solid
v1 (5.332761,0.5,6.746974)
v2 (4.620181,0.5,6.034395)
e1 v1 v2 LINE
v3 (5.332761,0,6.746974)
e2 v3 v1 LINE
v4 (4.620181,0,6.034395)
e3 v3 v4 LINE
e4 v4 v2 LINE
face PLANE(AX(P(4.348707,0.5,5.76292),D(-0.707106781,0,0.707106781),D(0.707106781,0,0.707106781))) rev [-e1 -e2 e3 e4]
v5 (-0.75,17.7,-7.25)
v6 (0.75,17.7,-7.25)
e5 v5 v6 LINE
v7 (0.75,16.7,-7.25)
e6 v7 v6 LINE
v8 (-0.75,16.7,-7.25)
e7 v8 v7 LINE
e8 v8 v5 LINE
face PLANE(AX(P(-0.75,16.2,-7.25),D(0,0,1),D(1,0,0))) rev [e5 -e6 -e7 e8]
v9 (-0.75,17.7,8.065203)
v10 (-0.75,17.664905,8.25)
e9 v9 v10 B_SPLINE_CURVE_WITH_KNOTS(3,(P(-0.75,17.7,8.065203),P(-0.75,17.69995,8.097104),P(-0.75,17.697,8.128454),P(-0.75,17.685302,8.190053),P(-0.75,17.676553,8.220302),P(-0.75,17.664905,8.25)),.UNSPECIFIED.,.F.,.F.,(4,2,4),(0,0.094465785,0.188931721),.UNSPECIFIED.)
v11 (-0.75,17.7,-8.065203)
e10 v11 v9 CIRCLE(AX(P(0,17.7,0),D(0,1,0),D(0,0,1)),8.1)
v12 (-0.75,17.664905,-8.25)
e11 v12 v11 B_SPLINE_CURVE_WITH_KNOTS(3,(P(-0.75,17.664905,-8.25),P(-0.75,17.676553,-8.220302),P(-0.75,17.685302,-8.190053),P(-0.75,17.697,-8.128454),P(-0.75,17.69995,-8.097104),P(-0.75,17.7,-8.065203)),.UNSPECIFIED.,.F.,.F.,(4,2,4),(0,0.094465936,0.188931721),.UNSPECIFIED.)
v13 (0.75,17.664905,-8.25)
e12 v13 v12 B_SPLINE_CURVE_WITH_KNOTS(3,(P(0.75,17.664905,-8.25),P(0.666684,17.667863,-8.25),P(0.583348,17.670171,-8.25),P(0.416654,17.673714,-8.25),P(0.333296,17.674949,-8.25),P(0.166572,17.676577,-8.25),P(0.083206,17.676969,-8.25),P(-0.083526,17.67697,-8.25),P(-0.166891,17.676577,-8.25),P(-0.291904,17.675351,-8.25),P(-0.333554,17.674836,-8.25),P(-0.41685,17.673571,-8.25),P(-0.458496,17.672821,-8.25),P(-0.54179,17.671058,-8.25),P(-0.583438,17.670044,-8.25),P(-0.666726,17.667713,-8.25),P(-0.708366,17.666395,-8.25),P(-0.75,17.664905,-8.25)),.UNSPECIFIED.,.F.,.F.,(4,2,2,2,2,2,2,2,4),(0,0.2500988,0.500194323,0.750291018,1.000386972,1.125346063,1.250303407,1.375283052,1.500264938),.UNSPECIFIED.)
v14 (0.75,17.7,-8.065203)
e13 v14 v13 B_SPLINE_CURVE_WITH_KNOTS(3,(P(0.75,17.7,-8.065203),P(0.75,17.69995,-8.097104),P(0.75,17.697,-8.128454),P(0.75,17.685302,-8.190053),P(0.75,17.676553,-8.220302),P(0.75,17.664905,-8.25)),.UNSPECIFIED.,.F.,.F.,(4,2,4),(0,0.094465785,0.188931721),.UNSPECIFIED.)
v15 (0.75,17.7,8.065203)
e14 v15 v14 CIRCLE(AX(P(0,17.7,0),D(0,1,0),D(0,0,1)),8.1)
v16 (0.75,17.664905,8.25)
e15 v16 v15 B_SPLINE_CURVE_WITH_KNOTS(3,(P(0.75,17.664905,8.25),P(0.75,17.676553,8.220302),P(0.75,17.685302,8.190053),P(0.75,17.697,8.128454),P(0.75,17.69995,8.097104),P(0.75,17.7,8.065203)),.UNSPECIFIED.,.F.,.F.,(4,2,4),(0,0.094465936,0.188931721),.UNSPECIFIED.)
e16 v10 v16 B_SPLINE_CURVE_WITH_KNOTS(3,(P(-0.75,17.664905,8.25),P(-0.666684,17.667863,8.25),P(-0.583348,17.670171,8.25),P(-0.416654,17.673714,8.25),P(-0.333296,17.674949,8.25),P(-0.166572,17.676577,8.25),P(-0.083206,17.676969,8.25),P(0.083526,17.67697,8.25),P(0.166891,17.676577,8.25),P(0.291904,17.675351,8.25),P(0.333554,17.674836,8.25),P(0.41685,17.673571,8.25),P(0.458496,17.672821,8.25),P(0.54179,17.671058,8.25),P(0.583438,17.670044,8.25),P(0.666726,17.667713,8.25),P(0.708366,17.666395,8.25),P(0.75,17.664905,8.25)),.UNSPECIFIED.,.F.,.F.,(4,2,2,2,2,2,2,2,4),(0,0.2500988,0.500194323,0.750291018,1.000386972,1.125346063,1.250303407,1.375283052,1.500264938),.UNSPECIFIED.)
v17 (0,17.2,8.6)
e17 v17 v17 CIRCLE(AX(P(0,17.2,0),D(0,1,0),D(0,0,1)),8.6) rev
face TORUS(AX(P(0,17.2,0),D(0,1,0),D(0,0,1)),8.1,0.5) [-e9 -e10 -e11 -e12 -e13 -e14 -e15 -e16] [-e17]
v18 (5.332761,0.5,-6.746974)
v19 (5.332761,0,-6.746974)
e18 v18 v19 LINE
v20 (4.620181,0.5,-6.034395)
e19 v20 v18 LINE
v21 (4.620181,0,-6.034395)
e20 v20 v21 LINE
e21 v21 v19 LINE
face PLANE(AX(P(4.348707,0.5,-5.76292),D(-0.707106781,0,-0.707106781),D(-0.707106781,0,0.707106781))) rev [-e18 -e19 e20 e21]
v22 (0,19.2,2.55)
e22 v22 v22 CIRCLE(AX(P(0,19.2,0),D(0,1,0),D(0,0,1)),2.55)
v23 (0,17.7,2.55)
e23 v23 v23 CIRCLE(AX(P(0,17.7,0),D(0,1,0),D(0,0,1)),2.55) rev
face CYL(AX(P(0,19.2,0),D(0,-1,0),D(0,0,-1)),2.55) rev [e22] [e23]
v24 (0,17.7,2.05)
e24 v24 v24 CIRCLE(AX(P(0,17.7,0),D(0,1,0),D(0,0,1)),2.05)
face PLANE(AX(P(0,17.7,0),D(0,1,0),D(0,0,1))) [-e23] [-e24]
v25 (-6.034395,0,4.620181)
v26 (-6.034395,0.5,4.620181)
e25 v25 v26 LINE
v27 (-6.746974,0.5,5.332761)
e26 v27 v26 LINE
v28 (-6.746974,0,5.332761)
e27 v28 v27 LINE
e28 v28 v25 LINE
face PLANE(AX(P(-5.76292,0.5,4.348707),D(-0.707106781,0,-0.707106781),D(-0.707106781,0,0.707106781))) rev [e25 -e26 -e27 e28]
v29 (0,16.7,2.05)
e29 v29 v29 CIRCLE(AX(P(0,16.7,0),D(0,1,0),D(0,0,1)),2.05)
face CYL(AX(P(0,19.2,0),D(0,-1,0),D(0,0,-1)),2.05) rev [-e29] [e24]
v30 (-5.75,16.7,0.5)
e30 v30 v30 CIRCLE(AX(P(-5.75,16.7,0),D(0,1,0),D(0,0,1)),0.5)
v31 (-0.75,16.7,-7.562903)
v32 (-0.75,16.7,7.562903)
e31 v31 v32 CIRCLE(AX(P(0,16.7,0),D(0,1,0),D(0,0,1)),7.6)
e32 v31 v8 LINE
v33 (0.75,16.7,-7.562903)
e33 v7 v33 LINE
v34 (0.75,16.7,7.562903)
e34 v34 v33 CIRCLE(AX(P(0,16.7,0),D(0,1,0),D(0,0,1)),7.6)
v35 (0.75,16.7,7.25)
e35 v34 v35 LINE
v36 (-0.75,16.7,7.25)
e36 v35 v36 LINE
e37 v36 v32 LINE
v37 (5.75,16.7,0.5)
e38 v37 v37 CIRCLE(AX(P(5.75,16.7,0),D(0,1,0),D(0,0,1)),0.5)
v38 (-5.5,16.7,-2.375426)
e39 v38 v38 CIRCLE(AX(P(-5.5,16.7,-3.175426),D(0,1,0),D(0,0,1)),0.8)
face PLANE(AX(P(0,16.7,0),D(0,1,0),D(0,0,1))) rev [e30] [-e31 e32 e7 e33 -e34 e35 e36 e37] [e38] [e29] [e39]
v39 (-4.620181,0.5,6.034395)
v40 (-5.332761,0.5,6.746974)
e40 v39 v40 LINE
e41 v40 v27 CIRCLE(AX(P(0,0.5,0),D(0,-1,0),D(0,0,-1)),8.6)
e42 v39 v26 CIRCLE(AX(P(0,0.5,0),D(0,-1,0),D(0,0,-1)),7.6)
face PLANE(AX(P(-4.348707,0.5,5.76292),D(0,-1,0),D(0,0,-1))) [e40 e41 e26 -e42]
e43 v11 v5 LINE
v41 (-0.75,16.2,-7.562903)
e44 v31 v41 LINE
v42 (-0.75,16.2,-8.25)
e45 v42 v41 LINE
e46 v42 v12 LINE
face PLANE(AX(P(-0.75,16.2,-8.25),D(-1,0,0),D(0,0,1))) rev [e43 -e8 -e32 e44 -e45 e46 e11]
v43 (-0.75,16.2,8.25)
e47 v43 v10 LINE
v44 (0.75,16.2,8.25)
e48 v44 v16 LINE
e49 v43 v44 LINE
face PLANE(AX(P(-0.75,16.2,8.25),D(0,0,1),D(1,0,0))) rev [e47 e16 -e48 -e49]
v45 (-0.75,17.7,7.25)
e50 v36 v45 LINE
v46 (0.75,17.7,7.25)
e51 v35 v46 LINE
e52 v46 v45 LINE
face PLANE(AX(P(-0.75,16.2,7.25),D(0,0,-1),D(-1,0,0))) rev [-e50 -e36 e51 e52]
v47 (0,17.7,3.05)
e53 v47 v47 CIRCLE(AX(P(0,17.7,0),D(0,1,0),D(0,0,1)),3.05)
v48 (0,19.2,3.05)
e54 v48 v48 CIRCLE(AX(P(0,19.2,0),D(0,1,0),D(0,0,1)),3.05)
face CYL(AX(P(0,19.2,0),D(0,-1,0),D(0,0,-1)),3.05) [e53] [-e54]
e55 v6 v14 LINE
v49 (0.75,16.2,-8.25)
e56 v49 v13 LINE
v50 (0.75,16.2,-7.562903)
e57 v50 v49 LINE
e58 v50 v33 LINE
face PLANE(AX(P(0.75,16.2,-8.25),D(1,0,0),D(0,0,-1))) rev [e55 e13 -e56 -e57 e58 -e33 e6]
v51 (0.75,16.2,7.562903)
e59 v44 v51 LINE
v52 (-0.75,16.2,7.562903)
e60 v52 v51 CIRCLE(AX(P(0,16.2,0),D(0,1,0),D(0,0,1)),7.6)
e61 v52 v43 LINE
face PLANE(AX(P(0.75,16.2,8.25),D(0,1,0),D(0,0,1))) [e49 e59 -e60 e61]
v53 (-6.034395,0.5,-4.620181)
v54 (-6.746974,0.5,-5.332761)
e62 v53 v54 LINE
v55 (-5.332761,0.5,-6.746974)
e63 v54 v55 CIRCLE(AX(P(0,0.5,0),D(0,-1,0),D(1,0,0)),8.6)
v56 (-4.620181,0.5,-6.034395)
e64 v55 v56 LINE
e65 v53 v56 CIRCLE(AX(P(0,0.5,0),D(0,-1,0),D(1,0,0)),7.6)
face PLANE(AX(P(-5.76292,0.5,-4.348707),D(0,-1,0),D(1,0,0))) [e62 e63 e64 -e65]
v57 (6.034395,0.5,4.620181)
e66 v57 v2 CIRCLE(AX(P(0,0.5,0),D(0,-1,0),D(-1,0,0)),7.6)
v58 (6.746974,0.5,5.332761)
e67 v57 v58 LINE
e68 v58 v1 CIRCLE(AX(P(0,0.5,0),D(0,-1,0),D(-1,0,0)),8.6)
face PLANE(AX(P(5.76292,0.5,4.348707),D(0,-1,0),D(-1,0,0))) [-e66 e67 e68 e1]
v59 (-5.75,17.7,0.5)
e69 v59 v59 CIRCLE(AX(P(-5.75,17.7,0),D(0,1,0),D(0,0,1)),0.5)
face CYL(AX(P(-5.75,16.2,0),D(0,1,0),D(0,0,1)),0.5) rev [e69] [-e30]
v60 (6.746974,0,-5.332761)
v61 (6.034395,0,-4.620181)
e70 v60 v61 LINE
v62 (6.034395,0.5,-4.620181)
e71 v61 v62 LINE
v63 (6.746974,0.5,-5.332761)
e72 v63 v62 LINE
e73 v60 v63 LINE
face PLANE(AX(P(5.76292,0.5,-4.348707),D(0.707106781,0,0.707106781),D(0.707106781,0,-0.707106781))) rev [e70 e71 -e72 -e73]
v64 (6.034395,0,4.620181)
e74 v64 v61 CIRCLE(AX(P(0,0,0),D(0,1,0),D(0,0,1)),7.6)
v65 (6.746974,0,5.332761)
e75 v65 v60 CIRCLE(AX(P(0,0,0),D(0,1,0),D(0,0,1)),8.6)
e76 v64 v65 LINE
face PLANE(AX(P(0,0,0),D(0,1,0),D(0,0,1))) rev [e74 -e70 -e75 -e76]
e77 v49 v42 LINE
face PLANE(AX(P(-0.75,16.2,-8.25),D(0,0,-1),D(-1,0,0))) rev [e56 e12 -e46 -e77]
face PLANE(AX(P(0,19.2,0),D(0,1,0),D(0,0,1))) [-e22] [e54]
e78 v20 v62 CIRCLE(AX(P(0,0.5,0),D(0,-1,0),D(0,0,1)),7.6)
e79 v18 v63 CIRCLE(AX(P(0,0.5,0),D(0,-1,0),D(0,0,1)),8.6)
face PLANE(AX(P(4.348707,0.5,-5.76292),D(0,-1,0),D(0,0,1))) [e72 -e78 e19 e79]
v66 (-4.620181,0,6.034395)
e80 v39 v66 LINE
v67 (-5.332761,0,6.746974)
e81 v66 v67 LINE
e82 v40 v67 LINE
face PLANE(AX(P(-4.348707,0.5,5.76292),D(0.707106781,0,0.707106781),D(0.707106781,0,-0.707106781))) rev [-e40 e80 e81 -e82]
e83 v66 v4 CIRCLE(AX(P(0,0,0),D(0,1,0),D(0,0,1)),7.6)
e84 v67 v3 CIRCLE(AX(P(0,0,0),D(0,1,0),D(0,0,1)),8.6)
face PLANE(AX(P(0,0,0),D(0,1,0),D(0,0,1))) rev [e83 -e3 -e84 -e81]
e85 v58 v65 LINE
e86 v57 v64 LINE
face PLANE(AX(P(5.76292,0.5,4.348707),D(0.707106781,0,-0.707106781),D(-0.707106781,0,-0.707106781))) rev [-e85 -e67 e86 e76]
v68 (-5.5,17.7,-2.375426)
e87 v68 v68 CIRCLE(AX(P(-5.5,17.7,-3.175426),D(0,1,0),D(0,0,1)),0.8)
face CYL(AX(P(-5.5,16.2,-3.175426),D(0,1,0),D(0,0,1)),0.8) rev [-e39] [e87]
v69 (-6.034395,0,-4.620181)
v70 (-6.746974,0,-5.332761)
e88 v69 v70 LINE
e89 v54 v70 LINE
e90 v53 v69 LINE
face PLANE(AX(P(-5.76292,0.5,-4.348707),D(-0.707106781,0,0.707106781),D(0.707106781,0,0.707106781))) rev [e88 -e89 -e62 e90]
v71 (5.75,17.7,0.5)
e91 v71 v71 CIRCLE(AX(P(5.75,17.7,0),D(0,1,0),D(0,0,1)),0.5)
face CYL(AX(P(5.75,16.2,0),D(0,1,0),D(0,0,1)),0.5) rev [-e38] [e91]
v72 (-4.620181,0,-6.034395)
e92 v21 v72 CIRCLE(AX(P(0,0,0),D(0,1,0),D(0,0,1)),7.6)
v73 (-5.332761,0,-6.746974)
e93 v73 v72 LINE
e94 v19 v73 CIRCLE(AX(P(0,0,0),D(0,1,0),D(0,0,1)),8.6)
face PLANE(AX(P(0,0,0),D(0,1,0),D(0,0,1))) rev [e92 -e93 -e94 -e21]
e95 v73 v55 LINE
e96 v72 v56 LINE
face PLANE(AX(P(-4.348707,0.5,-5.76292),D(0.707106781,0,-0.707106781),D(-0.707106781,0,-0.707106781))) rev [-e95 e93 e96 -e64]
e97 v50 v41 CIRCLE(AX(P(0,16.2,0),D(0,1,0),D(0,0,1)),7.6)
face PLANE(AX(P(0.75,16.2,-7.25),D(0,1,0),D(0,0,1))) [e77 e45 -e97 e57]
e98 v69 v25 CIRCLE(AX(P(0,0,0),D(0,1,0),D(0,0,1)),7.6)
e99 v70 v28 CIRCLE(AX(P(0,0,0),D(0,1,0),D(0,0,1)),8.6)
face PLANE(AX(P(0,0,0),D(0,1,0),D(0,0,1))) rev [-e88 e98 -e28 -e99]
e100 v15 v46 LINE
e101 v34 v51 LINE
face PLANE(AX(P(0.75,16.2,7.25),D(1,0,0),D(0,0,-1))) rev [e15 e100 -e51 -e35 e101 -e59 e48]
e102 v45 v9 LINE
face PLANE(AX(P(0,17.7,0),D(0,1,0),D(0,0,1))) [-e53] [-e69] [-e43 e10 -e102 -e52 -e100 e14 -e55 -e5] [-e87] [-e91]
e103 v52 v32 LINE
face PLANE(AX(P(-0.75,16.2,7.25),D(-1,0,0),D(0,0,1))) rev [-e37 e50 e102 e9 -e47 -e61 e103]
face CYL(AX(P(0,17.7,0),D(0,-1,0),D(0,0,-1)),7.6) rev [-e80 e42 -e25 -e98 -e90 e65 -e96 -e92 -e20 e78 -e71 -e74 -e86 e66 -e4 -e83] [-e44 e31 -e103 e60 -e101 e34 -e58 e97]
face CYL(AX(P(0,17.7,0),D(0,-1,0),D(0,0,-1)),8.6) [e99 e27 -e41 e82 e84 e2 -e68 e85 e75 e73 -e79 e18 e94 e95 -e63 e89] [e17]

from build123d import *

# Parameters (mm, degrees)
SKETCH_1_R               = 8.6
EXTRUDE_1_DEPTH          = 17.7
SKETCH_2_R               = 3.05
SKETCH_2_R_2             = 2.55
EXTRUDE_2_DEPTH          = 1.5
SHELL_4_OUTLINE_R        = 7.6
SHELL_4_DEPTH            = 16.7
SHELL_START              = 16.7
SHELL_4_2_OUTLINE_R      = 2.05
SHELL_4_2_DEPTH          = 1
SKETCH_5_R               = 0.8
SKETCH_5_R_2             = 0.5
SKETCH_5_W               = 1.5
SKETCH_5_H               = 1
CUT_EXTRUDE_5_DEPTH      = 1.5
CUT_EXTRUDE_6_DEPTH      = 0.5
PATTERN_CIRCULAR_1_COUNT = 4
FILLET_1_R               = 0.5


# Read off the part's stored shape, not the designer's step: 薄殼4
with BuildPart() as part:
    # 草圖1 → 伸長1 (new body)
    with BuildSketch(Plane(origin=(0, 0, 0), x_dir=(1, 0, 0), z_dir=(0, 1, 0))):
        with Locations(Location((0, 0, 0), (0, 0, 270))):
            Circle(SKETCH_1_R)
    extrude(amount=EXTRUDE_1_DEPTH)

    # 草圖2 → 伸長2 (add)
    with BuildSketch(Plane(origin=(0, 17.7, 0), x_dir=(1, 0, 0), z_dir=(0, 1, 0))):
        with Locations(Location((0, 0, 0), (0, 0, 270))):
            Circle(SKETCH_2_R)
        with Locations(Location((0, 0, 0), (0, 0, 270))):
            Circle(SKETCH_2_R_2, mode=Mode.SUBTRACT)
    extrude(amount=EXTRUDE_2_DEPTH)

    # 薄殼4 outline → 薄殼4 (cut)
    with BuildSketch(Plane(origin=(0, 0, 0), x_dir=(1, 0, 0), z_dir=(0, 1, 0))):
        Circle(SHELL_4_OUTLINE_R)
    extrude(amount=SHELL_4_DEPTH, mode=Mode.SUBTRACT)

    # Shell 4 2 outline → Shell 4 2 (cut)
    with BuildSketch(Plane(origin=(0, 0, 0), x_dir=(1, 0, 0), z_dir=(0, 1, 0)).offset(SHELL_START)):
        Circle(SHELL_4_2_OUTLINE_R)
    extrude(amount=SHELL_4_2_DEPTH, mode=Mode.SUBTRACT)

    # 草圖5 → 伸長5 (cut)
    with BuildSketch(Plane(origin=(0, 17.7, 0), x_dir=(1, 0, 0), z_dir=(0, 1, 0))):
        with Locations(Location((-5.5, 3.175426481, 0), (0, 0, 270))):
            Circle(SKETCH_5_R)
        with Locations(Location((-5.75, 0, 0), (0, 0, 270))):
            Circle(SKETCH_5_R_2)
        with Locations(Location((5.75, 0, 0), (0, 0, 270))):
            Circle(SKETCH_5_R_2)
        with Locations((0, 7.75)):
            Rectangle(SKETCH_5_W, SKETCH_5_H)
        with Locations((0, -7.75)):
            Rectangle(SKETCH_5_W, SKETCH_5_H)
    extrude(amount=-CUT_EXTRUDE_5_DEPTH, mode=Mode.SUBTRACT)

    # 草圖7 → 伸長6 (cut)
    with BuildSketch(Plane.XZ):
        Polygon((-5.762920267, 4.348706704), (-6.965001795, 5.550788232), (-5.550788232, 6.965001795), (-4.348706704, 5.762920267), align=None)
    cut_extrude_6 = extrude(amount=-CUT_EXTRUDE_6_DEPTH, mode=Mode.SUBTRACT)

    # 環狀複製排列1: 伸長6 ×4 about axis
    pattern_circular_1_axis = Axis((0, 0, 0), (0, 1, 0))
    for i in range(1, PATTERN_CIRCULAR_1_COUNT):
        add(cut_extrude_6.rotate(pattern_circular_1_axis, i * 360 / PATTERN_CIRCULAR_1_COUNT), mode=Mode.SUBTRACT)

    # 圓角1
    # the kernel refuses this fillet: 0.5 mm, written as the material it takes off along each edge
    with BuildSketch(Plane(origin=(0, 17.7, 0), x_dir=(0, 0, 1), z_dir=(-1, 0, 0))) as fillet_1_piece_1:
        with BuildLine():
            CenterArc((8.6 - FILLET_1_R, -FILLET_1_R), FILLET_1_R, 0, 90)
            Line((8.6 - FILLET_1_R, 0), (8.6, 0))
            Line((8.6, 0), (8.6, -FILLET_1_R))
        make_face()
    revolve(axis=Axis((0, 17.7, 0), (0, 1, 0)), mode=Mode.SUBTRACT)


solid = part.part
